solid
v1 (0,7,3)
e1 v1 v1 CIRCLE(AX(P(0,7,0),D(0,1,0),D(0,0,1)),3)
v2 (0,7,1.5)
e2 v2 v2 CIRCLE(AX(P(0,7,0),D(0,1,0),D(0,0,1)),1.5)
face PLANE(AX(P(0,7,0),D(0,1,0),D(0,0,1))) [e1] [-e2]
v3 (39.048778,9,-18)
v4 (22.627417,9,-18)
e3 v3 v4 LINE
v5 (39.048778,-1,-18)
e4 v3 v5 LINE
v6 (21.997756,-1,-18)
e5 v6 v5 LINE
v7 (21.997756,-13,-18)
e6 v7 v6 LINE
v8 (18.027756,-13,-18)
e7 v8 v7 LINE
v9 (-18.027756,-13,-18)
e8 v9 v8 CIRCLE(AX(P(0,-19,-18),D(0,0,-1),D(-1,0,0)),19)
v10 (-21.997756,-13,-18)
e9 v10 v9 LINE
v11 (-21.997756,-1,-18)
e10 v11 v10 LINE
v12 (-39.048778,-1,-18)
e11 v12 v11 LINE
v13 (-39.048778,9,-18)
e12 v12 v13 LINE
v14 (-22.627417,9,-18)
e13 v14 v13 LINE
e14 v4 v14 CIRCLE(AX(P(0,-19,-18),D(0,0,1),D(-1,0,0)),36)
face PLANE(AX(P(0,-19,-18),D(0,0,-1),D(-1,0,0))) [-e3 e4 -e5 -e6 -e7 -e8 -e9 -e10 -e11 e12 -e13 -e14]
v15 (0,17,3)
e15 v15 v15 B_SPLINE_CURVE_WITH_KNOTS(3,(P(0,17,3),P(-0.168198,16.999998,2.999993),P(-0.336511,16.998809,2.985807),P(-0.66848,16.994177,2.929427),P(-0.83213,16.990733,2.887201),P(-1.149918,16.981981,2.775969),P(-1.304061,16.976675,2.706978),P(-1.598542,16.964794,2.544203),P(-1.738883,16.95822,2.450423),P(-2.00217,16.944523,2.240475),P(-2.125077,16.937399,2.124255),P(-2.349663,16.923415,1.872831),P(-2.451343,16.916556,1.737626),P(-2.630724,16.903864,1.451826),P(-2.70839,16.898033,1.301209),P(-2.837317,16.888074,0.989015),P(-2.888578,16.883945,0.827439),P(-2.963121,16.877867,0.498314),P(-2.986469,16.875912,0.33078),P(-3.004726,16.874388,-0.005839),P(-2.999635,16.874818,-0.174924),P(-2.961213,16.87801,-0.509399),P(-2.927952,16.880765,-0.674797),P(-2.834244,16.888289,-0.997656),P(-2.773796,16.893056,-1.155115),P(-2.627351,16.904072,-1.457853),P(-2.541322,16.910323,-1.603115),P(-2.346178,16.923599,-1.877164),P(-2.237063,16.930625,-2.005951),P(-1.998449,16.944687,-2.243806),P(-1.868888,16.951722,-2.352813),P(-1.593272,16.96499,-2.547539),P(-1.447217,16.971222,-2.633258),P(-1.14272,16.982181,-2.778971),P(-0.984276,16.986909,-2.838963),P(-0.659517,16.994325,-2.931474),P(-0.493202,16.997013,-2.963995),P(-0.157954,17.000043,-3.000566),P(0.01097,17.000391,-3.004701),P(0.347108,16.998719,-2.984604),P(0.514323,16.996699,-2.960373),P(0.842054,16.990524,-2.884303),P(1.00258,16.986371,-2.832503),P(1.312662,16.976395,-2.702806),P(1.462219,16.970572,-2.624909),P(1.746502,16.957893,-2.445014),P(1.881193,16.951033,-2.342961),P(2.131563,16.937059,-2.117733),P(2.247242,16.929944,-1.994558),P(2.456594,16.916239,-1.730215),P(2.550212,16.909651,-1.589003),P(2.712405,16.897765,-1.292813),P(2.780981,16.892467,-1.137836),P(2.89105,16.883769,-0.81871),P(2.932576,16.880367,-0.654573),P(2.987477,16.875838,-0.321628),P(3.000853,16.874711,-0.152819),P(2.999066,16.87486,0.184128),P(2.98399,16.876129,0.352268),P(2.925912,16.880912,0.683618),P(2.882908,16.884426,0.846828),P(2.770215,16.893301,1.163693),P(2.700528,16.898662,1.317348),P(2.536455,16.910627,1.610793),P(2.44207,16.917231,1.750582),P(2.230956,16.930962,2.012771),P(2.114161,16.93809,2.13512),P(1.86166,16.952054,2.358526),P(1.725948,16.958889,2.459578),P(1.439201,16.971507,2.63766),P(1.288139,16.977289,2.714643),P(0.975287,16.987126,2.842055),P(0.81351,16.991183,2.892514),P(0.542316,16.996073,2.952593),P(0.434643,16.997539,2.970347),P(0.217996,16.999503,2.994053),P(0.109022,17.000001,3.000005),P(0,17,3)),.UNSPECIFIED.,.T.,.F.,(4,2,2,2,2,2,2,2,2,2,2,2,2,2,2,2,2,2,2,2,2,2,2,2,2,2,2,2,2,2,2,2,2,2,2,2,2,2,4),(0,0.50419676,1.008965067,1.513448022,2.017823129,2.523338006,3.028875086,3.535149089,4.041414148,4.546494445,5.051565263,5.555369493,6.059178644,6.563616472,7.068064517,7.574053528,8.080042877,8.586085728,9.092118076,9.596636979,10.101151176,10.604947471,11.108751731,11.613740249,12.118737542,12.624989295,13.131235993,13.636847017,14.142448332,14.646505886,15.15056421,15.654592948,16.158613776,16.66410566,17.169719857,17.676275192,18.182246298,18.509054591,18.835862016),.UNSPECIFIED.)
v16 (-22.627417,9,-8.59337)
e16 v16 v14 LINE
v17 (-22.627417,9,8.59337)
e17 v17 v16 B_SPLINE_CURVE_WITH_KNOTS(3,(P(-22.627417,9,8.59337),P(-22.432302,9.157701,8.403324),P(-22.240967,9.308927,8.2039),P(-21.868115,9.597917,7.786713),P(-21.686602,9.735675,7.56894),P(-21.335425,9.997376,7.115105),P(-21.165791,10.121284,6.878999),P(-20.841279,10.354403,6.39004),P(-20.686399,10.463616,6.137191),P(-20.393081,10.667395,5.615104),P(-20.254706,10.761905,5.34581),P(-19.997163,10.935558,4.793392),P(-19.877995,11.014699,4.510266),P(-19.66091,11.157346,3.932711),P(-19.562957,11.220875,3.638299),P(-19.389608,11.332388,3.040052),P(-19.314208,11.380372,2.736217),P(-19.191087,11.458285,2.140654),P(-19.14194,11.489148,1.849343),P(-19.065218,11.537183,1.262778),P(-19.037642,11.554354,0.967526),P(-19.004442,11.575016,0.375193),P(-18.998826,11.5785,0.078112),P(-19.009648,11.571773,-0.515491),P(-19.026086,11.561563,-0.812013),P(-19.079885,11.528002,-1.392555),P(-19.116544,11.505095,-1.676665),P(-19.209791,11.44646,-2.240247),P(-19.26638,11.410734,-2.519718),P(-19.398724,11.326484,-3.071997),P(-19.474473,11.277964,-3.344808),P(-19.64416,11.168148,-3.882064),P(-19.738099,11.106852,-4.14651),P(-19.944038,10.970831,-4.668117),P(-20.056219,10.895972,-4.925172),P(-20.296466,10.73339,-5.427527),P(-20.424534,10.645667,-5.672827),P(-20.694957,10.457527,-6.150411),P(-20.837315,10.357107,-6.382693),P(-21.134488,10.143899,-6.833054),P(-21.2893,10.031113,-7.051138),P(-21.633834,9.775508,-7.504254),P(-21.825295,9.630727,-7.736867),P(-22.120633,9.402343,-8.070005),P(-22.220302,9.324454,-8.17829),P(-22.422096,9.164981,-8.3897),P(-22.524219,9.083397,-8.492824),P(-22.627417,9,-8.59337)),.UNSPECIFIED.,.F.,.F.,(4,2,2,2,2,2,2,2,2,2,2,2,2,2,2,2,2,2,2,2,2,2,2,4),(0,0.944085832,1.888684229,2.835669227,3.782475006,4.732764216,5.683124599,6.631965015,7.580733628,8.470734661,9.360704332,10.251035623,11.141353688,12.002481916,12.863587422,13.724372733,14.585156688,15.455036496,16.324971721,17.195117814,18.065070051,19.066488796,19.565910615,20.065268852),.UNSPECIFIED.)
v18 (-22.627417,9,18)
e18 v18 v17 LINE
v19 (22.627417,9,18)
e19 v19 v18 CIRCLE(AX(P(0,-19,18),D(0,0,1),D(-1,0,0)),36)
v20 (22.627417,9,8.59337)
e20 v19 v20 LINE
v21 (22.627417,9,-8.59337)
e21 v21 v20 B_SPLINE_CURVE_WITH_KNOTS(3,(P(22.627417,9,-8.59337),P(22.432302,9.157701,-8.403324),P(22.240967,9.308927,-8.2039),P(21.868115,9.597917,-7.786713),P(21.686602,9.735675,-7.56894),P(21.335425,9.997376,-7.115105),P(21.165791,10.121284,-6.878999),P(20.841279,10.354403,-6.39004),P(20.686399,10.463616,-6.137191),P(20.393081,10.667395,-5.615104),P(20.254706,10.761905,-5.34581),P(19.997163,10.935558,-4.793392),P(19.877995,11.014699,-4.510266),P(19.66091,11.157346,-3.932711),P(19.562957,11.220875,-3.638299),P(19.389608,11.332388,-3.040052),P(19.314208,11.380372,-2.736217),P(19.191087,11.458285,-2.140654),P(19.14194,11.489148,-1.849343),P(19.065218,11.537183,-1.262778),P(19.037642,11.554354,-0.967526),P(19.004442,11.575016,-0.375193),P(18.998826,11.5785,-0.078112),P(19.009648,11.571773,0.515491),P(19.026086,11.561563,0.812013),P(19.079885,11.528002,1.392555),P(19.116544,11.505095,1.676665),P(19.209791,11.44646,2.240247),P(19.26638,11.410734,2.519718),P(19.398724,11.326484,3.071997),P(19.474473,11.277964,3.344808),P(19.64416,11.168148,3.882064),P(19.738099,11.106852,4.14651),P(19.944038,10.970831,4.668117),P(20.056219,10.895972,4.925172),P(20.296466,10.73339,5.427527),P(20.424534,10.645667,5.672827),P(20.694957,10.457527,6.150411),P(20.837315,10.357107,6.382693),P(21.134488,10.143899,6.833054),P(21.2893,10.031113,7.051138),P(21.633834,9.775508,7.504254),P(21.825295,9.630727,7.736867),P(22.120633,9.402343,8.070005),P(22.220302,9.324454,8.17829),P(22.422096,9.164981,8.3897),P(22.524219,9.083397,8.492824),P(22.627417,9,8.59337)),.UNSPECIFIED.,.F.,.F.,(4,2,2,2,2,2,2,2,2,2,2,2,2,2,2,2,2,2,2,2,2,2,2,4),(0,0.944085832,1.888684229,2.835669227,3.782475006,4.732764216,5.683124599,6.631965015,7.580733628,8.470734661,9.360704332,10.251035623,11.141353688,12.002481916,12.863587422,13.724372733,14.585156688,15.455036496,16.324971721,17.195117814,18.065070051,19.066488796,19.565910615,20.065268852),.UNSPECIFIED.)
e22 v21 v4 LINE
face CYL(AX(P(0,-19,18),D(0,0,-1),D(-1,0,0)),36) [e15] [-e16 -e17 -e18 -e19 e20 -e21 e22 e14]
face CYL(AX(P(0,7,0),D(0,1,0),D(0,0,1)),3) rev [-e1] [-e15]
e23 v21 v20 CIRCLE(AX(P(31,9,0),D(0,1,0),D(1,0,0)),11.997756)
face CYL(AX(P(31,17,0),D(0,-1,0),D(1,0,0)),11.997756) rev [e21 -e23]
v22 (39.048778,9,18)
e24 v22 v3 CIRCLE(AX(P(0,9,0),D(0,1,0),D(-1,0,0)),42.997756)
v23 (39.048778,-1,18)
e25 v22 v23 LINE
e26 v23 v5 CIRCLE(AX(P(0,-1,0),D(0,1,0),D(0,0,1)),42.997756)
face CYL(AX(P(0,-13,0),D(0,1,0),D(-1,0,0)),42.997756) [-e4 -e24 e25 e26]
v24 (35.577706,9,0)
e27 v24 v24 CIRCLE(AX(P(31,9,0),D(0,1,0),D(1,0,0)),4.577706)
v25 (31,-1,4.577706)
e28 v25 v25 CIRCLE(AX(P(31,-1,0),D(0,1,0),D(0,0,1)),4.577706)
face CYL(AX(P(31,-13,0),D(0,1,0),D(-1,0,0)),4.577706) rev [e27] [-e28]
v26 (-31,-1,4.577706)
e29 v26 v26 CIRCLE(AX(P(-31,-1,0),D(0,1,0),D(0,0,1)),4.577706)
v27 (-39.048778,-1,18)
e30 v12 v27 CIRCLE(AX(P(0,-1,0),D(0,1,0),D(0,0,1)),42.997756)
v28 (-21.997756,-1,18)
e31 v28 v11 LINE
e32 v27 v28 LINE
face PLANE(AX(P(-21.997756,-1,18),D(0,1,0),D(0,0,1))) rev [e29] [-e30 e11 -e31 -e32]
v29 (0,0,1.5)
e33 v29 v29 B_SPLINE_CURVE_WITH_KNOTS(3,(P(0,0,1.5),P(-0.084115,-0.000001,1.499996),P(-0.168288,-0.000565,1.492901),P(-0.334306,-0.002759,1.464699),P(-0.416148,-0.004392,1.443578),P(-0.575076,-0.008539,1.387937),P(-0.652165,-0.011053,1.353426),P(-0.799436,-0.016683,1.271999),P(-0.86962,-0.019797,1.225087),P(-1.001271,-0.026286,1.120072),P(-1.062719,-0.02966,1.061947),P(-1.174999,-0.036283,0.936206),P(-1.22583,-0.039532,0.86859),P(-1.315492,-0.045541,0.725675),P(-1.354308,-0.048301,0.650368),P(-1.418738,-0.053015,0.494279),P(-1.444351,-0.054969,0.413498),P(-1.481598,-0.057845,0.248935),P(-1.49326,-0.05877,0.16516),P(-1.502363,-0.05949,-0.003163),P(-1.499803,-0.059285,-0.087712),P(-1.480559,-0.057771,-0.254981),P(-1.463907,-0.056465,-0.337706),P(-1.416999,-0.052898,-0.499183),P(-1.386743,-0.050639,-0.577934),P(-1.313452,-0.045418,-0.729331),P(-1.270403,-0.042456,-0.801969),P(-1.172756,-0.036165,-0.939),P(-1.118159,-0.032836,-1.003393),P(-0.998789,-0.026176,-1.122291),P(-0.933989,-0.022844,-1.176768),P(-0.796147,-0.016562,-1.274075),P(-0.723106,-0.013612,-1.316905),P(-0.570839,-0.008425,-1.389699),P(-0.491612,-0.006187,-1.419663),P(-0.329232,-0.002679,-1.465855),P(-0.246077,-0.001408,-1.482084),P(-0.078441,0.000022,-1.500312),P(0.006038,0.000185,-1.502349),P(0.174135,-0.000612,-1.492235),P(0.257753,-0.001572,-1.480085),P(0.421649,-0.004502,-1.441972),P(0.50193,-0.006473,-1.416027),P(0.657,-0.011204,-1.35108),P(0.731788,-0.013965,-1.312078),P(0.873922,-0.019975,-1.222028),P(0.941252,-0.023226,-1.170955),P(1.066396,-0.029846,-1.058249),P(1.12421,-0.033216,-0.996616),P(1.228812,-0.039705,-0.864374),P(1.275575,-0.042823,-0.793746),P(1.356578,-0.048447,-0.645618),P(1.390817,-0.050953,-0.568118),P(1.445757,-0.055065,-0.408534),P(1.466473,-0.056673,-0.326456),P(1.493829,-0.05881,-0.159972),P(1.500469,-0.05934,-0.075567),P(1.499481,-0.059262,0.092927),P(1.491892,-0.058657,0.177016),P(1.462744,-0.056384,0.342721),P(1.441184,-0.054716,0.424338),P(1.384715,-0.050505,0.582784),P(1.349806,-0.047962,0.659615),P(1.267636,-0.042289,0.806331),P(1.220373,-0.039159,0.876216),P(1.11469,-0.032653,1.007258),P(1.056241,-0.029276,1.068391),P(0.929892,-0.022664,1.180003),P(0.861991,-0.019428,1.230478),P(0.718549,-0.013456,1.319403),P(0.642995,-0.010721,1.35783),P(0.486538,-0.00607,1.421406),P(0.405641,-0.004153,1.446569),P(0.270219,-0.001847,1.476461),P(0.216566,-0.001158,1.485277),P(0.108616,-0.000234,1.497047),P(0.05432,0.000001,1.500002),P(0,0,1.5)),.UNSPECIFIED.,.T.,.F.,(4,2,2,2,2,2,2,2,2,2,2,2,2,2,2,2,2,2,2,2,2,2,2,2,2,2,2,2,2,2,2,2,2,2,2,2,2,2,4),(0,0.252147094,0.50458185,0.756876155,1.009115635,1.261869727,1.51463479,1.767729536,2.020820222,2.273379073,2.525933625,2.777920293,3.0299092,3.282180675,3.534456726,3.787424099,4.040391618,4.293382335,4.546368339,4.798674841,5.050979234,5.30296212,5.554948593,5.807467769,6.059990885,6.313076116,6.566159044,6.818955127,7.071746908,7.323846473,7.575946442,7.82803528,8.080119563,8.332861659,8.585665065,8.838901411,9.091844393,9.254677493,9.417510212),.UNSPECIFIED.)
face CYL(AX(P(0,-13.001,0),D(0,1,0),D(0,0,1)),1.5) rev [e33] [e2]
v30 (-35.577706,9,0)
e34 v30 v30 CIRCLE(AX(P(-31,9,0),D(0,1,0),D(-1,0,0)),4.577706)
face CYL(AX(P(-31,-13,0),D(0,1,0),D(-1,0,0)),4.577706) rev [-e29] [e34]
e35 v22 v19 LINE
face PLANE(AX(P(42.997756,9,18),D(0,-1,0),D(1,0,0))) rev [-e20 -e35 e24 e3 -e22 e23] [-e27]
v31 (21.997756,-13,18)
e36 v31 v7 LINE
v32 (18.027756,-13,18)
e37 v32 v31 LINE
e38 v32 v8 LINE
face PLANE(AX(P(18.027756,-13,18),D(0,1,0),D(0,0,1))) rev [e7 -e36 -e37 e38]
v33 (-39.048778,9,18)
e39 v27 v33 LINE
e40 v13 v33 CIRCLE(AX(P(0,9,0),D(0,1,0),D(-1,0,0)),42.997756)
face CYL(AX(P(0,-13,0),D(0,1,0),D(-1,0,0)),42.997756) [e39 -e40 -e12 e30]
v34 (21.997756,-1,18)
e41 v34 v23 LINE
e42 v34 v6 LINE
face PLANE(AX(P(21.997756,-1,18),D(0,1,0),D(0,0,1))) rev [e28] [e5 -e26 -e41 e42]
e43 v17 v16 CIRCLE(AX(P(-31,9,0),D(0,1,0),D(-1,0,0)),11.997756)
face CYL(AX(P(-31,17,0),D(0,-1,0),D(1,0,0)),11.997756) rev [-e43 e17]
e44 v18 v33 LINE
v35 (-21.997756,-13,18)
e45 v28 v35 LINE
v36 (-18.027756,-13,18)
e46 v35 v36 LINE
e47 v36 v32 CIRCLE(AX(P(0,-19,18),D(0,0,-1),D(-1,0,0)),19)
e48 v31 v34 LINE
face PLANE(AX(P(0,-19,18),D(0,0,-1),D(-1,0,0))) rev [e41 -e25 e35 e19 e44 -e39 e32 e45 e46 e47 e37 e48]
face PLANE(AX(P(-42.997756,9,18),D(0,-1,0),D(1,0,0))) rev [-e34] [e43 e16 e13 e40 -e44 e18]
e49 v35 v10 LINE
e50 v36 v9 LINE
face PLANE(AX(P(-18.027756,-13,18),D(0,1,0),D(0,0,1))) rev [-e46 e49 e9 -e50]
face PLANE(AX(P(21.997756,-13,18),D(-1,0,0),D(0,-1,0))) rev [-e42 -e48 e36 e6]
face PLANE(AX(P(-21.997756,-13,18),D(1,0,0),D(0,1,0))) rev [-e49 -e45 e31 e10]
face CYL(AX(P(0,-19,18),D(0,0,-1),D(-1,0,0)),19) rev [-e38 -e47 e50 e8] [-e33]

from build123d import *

# Parameters (mm, degrees)
BOSS_EXTRUDE2_DEPTH     = 18
CUT_EXTRUDE1_START      = -10
CUT_EXTRUDE1_DEPTH      = 10
SKETCH4_R               = 4.577705579
CUT_EXTRUDE2_DEPTH      = 52.544224249
CUT_EXTRUDE3_DEPTH      = 52.544224249
SKETCH6_R               = 3
CUT_EXTRUDE4_DEPTH      = 10
CUT_EXTRUDE5_REACH      = 52.723
CUT_EXTRUDE5_END_RADIUS = 19
SKETCH7_R               = 1.5


# Read off the part's stored shape, not the designer's step: Cut-Extrude1
with BuildPart() as part:
    # Sketch1 → Boss-Extrude2 (new, symmetric)
    with BuildSketch(Plane.XY):
        with BuildLine():
            Line((18.027756377, -13), (21.997756377, -13))
            Line((21.997756377, -13), (21.997756377, -1))
            Line((21.997756377, -1), (42.997756377, -1))
            Line((42.997756377, -1), (42.997756377, 9))
            Line((42.997756377, 9), (22.627416998, 9))
            ThreePointArc((22.627416998, 9), (0, 17), (-22.627416998, 9))
            Line((-22.627416998, 9), (-42.997756377, 9))
            Line((-42.997756377, 9), (-42.997756377, -1))
            Line((-42.997756377, -1), (-21.997756377, -1))
            Line((-21.997756377, -1), (-21.997756377, -13))
            Line((-21.997756377, -13), (-18.027756377, -13))
            ThreePointArc((-18.027756377, -13), (0, 0), (18.027756377, -13))
        make_face()
    extrude(amount=BOSS_EXTRUDE2_DEPTH, both=True)

    # Cut-Extrude1 outline → Cut-Extrude1 (cut)
    with BuildSketch(Plane(origin=(0, 9, 0), x_dir=(1, 0, 0), z_dir=(0, 1, 0)).offset(CUT_EXTRUDE1_START)):
        with BuildLine():
            ThreePointArc((42.997756377, 0), (41.998910053, -9.214044053), (39.048777874, -18))
            Line((39.048777874, -18), (42.997756377, -18))
            Line((42.997756377, -18), (42.997756377, 0))
        make_face()
        with BuildLine():
            ThreePointArc((39.048777874, 18), (41.998910053, 9.214044053), (42.997756377, 0))
            Line((42.997756377, 0), (42.997756377, 18))
            Line((42.997756377, 18), (39.048777874, 18))
        make_face()
        with BuildLine():
            Line((-42.997756377, -18), (-39.048777874, -18))
            ThreePointArc((-39.048777874, -18), (-41.998910053, -9.214044053), (-42.997756377, 0))
            Line((-42.997756377, 0), (-42.997756377, -18))
        make_face()
        with BuildLine():
            Line((-42.997756377, 18), (-42.997756377, 0))
            ThreePointArc((-42.997756377, 0), (-41.998910053, 9.214044053), (-39.048777874, 18))
            Line((-39.048777874, 18), (-42.997756377, 18))
        make_face()
    extrude(amount=CUT_EXTRUDE1_DEPTH, mode=Mode.SUBTRACT)

    # Sketch4 → Cut-Extrude2 (cut, through all)
    with BuildSketch(Plane(origin=(0, 9, 0), x_dir=(1, 0, 0), z_dir=(0, 1, 0))):
        with Locations(Location((-31, 0, 0), (0, 0, 180))):
            Circle(SKETCH4_R)
        with Locations(Location((31, 0, 0), (0, 0, 270))):
            Circle(SKETCH4_R)
    extrude(amount=-CUT_EXTRUDE2_DEPTH, mode=Mode.SUBTRACT)

    # Sketch5 → Cut-Extrude3 (cut, through all)
    with BuildSketch(Plane(origin=(0, 9, 0), x_dir=(1, 0, 0), z_dir=(0, 1, 0))):
        with BuildLine():
            Line((-22.627416998, 8.593370233), (-22.627416998, -8.593370233))
            ThreePointArc((-22.627416998, -8.593370233), (-19.002243623, 0), (-22.627416998, 8.593370233))
        make_face()
        with BuildLine():
            Line((22.627416998, 8.593370233), (22.627416998, -8.593370233))
            ThreePointArc((22.627416998, -8.593370233), (19.002243623, 0), (22.627416998, 8.593370233))
        make_face()
    extrude(amount=CUT_EXTRUDE3_DEPTH, mode=Mode.SUBTRACT)

    # Sketch6 → Cut-Extrude4 (cut)
    with BuildSketch(Plane(origin=(0, 17, 0), x_dir=(1, 0, 0), z_dir=(0, 1, 0))):
        with Locations(Location((0, 0, 0), (0, 0, 270))):
            Circle(SKETCH6_R)
    extrude(amount=-CUT_EXTRUDE4_DEPTH, mode=Mode.SUBTRACT)

    # Cut-Extrude5: up to this cylinder (the profile starts outside it)
    cut_extrude5_end = Plane(origin=(0, -19, 0), z_dir=(0, 0, -1)) * Cylinder(CUT_EXTRUDE5_END_RADIUS, 144.446, mode=Mode.PRIVATE)
    # Sketch7 → Cut-Extrude5 (cut, up to the surface)
    with BuildSketch(Plane(origin=(0, 7, 0), x_dir=(1, 0, 0), z_dir=(0, 1, 0)), mode=Mode.PRIVATE) as cut_extrude5_sk1:
        with Locations(Location((0, 0, 0), (0, 0, 270))):
            Circle(SKETCH7_R)
    cut_extrude5_tool1 = extrude(cut_extrude5_sk1.sketch, amount=-CUT_EXTRUDE5_REACH, mode=Mode.PRIVATE) - cut_extrude5_end
    add(cut_extrude5_tool1.solids().sort_by_distance((0, 7, 0))[0], mode=Mode.SUBTRACT)


solid = part.part
